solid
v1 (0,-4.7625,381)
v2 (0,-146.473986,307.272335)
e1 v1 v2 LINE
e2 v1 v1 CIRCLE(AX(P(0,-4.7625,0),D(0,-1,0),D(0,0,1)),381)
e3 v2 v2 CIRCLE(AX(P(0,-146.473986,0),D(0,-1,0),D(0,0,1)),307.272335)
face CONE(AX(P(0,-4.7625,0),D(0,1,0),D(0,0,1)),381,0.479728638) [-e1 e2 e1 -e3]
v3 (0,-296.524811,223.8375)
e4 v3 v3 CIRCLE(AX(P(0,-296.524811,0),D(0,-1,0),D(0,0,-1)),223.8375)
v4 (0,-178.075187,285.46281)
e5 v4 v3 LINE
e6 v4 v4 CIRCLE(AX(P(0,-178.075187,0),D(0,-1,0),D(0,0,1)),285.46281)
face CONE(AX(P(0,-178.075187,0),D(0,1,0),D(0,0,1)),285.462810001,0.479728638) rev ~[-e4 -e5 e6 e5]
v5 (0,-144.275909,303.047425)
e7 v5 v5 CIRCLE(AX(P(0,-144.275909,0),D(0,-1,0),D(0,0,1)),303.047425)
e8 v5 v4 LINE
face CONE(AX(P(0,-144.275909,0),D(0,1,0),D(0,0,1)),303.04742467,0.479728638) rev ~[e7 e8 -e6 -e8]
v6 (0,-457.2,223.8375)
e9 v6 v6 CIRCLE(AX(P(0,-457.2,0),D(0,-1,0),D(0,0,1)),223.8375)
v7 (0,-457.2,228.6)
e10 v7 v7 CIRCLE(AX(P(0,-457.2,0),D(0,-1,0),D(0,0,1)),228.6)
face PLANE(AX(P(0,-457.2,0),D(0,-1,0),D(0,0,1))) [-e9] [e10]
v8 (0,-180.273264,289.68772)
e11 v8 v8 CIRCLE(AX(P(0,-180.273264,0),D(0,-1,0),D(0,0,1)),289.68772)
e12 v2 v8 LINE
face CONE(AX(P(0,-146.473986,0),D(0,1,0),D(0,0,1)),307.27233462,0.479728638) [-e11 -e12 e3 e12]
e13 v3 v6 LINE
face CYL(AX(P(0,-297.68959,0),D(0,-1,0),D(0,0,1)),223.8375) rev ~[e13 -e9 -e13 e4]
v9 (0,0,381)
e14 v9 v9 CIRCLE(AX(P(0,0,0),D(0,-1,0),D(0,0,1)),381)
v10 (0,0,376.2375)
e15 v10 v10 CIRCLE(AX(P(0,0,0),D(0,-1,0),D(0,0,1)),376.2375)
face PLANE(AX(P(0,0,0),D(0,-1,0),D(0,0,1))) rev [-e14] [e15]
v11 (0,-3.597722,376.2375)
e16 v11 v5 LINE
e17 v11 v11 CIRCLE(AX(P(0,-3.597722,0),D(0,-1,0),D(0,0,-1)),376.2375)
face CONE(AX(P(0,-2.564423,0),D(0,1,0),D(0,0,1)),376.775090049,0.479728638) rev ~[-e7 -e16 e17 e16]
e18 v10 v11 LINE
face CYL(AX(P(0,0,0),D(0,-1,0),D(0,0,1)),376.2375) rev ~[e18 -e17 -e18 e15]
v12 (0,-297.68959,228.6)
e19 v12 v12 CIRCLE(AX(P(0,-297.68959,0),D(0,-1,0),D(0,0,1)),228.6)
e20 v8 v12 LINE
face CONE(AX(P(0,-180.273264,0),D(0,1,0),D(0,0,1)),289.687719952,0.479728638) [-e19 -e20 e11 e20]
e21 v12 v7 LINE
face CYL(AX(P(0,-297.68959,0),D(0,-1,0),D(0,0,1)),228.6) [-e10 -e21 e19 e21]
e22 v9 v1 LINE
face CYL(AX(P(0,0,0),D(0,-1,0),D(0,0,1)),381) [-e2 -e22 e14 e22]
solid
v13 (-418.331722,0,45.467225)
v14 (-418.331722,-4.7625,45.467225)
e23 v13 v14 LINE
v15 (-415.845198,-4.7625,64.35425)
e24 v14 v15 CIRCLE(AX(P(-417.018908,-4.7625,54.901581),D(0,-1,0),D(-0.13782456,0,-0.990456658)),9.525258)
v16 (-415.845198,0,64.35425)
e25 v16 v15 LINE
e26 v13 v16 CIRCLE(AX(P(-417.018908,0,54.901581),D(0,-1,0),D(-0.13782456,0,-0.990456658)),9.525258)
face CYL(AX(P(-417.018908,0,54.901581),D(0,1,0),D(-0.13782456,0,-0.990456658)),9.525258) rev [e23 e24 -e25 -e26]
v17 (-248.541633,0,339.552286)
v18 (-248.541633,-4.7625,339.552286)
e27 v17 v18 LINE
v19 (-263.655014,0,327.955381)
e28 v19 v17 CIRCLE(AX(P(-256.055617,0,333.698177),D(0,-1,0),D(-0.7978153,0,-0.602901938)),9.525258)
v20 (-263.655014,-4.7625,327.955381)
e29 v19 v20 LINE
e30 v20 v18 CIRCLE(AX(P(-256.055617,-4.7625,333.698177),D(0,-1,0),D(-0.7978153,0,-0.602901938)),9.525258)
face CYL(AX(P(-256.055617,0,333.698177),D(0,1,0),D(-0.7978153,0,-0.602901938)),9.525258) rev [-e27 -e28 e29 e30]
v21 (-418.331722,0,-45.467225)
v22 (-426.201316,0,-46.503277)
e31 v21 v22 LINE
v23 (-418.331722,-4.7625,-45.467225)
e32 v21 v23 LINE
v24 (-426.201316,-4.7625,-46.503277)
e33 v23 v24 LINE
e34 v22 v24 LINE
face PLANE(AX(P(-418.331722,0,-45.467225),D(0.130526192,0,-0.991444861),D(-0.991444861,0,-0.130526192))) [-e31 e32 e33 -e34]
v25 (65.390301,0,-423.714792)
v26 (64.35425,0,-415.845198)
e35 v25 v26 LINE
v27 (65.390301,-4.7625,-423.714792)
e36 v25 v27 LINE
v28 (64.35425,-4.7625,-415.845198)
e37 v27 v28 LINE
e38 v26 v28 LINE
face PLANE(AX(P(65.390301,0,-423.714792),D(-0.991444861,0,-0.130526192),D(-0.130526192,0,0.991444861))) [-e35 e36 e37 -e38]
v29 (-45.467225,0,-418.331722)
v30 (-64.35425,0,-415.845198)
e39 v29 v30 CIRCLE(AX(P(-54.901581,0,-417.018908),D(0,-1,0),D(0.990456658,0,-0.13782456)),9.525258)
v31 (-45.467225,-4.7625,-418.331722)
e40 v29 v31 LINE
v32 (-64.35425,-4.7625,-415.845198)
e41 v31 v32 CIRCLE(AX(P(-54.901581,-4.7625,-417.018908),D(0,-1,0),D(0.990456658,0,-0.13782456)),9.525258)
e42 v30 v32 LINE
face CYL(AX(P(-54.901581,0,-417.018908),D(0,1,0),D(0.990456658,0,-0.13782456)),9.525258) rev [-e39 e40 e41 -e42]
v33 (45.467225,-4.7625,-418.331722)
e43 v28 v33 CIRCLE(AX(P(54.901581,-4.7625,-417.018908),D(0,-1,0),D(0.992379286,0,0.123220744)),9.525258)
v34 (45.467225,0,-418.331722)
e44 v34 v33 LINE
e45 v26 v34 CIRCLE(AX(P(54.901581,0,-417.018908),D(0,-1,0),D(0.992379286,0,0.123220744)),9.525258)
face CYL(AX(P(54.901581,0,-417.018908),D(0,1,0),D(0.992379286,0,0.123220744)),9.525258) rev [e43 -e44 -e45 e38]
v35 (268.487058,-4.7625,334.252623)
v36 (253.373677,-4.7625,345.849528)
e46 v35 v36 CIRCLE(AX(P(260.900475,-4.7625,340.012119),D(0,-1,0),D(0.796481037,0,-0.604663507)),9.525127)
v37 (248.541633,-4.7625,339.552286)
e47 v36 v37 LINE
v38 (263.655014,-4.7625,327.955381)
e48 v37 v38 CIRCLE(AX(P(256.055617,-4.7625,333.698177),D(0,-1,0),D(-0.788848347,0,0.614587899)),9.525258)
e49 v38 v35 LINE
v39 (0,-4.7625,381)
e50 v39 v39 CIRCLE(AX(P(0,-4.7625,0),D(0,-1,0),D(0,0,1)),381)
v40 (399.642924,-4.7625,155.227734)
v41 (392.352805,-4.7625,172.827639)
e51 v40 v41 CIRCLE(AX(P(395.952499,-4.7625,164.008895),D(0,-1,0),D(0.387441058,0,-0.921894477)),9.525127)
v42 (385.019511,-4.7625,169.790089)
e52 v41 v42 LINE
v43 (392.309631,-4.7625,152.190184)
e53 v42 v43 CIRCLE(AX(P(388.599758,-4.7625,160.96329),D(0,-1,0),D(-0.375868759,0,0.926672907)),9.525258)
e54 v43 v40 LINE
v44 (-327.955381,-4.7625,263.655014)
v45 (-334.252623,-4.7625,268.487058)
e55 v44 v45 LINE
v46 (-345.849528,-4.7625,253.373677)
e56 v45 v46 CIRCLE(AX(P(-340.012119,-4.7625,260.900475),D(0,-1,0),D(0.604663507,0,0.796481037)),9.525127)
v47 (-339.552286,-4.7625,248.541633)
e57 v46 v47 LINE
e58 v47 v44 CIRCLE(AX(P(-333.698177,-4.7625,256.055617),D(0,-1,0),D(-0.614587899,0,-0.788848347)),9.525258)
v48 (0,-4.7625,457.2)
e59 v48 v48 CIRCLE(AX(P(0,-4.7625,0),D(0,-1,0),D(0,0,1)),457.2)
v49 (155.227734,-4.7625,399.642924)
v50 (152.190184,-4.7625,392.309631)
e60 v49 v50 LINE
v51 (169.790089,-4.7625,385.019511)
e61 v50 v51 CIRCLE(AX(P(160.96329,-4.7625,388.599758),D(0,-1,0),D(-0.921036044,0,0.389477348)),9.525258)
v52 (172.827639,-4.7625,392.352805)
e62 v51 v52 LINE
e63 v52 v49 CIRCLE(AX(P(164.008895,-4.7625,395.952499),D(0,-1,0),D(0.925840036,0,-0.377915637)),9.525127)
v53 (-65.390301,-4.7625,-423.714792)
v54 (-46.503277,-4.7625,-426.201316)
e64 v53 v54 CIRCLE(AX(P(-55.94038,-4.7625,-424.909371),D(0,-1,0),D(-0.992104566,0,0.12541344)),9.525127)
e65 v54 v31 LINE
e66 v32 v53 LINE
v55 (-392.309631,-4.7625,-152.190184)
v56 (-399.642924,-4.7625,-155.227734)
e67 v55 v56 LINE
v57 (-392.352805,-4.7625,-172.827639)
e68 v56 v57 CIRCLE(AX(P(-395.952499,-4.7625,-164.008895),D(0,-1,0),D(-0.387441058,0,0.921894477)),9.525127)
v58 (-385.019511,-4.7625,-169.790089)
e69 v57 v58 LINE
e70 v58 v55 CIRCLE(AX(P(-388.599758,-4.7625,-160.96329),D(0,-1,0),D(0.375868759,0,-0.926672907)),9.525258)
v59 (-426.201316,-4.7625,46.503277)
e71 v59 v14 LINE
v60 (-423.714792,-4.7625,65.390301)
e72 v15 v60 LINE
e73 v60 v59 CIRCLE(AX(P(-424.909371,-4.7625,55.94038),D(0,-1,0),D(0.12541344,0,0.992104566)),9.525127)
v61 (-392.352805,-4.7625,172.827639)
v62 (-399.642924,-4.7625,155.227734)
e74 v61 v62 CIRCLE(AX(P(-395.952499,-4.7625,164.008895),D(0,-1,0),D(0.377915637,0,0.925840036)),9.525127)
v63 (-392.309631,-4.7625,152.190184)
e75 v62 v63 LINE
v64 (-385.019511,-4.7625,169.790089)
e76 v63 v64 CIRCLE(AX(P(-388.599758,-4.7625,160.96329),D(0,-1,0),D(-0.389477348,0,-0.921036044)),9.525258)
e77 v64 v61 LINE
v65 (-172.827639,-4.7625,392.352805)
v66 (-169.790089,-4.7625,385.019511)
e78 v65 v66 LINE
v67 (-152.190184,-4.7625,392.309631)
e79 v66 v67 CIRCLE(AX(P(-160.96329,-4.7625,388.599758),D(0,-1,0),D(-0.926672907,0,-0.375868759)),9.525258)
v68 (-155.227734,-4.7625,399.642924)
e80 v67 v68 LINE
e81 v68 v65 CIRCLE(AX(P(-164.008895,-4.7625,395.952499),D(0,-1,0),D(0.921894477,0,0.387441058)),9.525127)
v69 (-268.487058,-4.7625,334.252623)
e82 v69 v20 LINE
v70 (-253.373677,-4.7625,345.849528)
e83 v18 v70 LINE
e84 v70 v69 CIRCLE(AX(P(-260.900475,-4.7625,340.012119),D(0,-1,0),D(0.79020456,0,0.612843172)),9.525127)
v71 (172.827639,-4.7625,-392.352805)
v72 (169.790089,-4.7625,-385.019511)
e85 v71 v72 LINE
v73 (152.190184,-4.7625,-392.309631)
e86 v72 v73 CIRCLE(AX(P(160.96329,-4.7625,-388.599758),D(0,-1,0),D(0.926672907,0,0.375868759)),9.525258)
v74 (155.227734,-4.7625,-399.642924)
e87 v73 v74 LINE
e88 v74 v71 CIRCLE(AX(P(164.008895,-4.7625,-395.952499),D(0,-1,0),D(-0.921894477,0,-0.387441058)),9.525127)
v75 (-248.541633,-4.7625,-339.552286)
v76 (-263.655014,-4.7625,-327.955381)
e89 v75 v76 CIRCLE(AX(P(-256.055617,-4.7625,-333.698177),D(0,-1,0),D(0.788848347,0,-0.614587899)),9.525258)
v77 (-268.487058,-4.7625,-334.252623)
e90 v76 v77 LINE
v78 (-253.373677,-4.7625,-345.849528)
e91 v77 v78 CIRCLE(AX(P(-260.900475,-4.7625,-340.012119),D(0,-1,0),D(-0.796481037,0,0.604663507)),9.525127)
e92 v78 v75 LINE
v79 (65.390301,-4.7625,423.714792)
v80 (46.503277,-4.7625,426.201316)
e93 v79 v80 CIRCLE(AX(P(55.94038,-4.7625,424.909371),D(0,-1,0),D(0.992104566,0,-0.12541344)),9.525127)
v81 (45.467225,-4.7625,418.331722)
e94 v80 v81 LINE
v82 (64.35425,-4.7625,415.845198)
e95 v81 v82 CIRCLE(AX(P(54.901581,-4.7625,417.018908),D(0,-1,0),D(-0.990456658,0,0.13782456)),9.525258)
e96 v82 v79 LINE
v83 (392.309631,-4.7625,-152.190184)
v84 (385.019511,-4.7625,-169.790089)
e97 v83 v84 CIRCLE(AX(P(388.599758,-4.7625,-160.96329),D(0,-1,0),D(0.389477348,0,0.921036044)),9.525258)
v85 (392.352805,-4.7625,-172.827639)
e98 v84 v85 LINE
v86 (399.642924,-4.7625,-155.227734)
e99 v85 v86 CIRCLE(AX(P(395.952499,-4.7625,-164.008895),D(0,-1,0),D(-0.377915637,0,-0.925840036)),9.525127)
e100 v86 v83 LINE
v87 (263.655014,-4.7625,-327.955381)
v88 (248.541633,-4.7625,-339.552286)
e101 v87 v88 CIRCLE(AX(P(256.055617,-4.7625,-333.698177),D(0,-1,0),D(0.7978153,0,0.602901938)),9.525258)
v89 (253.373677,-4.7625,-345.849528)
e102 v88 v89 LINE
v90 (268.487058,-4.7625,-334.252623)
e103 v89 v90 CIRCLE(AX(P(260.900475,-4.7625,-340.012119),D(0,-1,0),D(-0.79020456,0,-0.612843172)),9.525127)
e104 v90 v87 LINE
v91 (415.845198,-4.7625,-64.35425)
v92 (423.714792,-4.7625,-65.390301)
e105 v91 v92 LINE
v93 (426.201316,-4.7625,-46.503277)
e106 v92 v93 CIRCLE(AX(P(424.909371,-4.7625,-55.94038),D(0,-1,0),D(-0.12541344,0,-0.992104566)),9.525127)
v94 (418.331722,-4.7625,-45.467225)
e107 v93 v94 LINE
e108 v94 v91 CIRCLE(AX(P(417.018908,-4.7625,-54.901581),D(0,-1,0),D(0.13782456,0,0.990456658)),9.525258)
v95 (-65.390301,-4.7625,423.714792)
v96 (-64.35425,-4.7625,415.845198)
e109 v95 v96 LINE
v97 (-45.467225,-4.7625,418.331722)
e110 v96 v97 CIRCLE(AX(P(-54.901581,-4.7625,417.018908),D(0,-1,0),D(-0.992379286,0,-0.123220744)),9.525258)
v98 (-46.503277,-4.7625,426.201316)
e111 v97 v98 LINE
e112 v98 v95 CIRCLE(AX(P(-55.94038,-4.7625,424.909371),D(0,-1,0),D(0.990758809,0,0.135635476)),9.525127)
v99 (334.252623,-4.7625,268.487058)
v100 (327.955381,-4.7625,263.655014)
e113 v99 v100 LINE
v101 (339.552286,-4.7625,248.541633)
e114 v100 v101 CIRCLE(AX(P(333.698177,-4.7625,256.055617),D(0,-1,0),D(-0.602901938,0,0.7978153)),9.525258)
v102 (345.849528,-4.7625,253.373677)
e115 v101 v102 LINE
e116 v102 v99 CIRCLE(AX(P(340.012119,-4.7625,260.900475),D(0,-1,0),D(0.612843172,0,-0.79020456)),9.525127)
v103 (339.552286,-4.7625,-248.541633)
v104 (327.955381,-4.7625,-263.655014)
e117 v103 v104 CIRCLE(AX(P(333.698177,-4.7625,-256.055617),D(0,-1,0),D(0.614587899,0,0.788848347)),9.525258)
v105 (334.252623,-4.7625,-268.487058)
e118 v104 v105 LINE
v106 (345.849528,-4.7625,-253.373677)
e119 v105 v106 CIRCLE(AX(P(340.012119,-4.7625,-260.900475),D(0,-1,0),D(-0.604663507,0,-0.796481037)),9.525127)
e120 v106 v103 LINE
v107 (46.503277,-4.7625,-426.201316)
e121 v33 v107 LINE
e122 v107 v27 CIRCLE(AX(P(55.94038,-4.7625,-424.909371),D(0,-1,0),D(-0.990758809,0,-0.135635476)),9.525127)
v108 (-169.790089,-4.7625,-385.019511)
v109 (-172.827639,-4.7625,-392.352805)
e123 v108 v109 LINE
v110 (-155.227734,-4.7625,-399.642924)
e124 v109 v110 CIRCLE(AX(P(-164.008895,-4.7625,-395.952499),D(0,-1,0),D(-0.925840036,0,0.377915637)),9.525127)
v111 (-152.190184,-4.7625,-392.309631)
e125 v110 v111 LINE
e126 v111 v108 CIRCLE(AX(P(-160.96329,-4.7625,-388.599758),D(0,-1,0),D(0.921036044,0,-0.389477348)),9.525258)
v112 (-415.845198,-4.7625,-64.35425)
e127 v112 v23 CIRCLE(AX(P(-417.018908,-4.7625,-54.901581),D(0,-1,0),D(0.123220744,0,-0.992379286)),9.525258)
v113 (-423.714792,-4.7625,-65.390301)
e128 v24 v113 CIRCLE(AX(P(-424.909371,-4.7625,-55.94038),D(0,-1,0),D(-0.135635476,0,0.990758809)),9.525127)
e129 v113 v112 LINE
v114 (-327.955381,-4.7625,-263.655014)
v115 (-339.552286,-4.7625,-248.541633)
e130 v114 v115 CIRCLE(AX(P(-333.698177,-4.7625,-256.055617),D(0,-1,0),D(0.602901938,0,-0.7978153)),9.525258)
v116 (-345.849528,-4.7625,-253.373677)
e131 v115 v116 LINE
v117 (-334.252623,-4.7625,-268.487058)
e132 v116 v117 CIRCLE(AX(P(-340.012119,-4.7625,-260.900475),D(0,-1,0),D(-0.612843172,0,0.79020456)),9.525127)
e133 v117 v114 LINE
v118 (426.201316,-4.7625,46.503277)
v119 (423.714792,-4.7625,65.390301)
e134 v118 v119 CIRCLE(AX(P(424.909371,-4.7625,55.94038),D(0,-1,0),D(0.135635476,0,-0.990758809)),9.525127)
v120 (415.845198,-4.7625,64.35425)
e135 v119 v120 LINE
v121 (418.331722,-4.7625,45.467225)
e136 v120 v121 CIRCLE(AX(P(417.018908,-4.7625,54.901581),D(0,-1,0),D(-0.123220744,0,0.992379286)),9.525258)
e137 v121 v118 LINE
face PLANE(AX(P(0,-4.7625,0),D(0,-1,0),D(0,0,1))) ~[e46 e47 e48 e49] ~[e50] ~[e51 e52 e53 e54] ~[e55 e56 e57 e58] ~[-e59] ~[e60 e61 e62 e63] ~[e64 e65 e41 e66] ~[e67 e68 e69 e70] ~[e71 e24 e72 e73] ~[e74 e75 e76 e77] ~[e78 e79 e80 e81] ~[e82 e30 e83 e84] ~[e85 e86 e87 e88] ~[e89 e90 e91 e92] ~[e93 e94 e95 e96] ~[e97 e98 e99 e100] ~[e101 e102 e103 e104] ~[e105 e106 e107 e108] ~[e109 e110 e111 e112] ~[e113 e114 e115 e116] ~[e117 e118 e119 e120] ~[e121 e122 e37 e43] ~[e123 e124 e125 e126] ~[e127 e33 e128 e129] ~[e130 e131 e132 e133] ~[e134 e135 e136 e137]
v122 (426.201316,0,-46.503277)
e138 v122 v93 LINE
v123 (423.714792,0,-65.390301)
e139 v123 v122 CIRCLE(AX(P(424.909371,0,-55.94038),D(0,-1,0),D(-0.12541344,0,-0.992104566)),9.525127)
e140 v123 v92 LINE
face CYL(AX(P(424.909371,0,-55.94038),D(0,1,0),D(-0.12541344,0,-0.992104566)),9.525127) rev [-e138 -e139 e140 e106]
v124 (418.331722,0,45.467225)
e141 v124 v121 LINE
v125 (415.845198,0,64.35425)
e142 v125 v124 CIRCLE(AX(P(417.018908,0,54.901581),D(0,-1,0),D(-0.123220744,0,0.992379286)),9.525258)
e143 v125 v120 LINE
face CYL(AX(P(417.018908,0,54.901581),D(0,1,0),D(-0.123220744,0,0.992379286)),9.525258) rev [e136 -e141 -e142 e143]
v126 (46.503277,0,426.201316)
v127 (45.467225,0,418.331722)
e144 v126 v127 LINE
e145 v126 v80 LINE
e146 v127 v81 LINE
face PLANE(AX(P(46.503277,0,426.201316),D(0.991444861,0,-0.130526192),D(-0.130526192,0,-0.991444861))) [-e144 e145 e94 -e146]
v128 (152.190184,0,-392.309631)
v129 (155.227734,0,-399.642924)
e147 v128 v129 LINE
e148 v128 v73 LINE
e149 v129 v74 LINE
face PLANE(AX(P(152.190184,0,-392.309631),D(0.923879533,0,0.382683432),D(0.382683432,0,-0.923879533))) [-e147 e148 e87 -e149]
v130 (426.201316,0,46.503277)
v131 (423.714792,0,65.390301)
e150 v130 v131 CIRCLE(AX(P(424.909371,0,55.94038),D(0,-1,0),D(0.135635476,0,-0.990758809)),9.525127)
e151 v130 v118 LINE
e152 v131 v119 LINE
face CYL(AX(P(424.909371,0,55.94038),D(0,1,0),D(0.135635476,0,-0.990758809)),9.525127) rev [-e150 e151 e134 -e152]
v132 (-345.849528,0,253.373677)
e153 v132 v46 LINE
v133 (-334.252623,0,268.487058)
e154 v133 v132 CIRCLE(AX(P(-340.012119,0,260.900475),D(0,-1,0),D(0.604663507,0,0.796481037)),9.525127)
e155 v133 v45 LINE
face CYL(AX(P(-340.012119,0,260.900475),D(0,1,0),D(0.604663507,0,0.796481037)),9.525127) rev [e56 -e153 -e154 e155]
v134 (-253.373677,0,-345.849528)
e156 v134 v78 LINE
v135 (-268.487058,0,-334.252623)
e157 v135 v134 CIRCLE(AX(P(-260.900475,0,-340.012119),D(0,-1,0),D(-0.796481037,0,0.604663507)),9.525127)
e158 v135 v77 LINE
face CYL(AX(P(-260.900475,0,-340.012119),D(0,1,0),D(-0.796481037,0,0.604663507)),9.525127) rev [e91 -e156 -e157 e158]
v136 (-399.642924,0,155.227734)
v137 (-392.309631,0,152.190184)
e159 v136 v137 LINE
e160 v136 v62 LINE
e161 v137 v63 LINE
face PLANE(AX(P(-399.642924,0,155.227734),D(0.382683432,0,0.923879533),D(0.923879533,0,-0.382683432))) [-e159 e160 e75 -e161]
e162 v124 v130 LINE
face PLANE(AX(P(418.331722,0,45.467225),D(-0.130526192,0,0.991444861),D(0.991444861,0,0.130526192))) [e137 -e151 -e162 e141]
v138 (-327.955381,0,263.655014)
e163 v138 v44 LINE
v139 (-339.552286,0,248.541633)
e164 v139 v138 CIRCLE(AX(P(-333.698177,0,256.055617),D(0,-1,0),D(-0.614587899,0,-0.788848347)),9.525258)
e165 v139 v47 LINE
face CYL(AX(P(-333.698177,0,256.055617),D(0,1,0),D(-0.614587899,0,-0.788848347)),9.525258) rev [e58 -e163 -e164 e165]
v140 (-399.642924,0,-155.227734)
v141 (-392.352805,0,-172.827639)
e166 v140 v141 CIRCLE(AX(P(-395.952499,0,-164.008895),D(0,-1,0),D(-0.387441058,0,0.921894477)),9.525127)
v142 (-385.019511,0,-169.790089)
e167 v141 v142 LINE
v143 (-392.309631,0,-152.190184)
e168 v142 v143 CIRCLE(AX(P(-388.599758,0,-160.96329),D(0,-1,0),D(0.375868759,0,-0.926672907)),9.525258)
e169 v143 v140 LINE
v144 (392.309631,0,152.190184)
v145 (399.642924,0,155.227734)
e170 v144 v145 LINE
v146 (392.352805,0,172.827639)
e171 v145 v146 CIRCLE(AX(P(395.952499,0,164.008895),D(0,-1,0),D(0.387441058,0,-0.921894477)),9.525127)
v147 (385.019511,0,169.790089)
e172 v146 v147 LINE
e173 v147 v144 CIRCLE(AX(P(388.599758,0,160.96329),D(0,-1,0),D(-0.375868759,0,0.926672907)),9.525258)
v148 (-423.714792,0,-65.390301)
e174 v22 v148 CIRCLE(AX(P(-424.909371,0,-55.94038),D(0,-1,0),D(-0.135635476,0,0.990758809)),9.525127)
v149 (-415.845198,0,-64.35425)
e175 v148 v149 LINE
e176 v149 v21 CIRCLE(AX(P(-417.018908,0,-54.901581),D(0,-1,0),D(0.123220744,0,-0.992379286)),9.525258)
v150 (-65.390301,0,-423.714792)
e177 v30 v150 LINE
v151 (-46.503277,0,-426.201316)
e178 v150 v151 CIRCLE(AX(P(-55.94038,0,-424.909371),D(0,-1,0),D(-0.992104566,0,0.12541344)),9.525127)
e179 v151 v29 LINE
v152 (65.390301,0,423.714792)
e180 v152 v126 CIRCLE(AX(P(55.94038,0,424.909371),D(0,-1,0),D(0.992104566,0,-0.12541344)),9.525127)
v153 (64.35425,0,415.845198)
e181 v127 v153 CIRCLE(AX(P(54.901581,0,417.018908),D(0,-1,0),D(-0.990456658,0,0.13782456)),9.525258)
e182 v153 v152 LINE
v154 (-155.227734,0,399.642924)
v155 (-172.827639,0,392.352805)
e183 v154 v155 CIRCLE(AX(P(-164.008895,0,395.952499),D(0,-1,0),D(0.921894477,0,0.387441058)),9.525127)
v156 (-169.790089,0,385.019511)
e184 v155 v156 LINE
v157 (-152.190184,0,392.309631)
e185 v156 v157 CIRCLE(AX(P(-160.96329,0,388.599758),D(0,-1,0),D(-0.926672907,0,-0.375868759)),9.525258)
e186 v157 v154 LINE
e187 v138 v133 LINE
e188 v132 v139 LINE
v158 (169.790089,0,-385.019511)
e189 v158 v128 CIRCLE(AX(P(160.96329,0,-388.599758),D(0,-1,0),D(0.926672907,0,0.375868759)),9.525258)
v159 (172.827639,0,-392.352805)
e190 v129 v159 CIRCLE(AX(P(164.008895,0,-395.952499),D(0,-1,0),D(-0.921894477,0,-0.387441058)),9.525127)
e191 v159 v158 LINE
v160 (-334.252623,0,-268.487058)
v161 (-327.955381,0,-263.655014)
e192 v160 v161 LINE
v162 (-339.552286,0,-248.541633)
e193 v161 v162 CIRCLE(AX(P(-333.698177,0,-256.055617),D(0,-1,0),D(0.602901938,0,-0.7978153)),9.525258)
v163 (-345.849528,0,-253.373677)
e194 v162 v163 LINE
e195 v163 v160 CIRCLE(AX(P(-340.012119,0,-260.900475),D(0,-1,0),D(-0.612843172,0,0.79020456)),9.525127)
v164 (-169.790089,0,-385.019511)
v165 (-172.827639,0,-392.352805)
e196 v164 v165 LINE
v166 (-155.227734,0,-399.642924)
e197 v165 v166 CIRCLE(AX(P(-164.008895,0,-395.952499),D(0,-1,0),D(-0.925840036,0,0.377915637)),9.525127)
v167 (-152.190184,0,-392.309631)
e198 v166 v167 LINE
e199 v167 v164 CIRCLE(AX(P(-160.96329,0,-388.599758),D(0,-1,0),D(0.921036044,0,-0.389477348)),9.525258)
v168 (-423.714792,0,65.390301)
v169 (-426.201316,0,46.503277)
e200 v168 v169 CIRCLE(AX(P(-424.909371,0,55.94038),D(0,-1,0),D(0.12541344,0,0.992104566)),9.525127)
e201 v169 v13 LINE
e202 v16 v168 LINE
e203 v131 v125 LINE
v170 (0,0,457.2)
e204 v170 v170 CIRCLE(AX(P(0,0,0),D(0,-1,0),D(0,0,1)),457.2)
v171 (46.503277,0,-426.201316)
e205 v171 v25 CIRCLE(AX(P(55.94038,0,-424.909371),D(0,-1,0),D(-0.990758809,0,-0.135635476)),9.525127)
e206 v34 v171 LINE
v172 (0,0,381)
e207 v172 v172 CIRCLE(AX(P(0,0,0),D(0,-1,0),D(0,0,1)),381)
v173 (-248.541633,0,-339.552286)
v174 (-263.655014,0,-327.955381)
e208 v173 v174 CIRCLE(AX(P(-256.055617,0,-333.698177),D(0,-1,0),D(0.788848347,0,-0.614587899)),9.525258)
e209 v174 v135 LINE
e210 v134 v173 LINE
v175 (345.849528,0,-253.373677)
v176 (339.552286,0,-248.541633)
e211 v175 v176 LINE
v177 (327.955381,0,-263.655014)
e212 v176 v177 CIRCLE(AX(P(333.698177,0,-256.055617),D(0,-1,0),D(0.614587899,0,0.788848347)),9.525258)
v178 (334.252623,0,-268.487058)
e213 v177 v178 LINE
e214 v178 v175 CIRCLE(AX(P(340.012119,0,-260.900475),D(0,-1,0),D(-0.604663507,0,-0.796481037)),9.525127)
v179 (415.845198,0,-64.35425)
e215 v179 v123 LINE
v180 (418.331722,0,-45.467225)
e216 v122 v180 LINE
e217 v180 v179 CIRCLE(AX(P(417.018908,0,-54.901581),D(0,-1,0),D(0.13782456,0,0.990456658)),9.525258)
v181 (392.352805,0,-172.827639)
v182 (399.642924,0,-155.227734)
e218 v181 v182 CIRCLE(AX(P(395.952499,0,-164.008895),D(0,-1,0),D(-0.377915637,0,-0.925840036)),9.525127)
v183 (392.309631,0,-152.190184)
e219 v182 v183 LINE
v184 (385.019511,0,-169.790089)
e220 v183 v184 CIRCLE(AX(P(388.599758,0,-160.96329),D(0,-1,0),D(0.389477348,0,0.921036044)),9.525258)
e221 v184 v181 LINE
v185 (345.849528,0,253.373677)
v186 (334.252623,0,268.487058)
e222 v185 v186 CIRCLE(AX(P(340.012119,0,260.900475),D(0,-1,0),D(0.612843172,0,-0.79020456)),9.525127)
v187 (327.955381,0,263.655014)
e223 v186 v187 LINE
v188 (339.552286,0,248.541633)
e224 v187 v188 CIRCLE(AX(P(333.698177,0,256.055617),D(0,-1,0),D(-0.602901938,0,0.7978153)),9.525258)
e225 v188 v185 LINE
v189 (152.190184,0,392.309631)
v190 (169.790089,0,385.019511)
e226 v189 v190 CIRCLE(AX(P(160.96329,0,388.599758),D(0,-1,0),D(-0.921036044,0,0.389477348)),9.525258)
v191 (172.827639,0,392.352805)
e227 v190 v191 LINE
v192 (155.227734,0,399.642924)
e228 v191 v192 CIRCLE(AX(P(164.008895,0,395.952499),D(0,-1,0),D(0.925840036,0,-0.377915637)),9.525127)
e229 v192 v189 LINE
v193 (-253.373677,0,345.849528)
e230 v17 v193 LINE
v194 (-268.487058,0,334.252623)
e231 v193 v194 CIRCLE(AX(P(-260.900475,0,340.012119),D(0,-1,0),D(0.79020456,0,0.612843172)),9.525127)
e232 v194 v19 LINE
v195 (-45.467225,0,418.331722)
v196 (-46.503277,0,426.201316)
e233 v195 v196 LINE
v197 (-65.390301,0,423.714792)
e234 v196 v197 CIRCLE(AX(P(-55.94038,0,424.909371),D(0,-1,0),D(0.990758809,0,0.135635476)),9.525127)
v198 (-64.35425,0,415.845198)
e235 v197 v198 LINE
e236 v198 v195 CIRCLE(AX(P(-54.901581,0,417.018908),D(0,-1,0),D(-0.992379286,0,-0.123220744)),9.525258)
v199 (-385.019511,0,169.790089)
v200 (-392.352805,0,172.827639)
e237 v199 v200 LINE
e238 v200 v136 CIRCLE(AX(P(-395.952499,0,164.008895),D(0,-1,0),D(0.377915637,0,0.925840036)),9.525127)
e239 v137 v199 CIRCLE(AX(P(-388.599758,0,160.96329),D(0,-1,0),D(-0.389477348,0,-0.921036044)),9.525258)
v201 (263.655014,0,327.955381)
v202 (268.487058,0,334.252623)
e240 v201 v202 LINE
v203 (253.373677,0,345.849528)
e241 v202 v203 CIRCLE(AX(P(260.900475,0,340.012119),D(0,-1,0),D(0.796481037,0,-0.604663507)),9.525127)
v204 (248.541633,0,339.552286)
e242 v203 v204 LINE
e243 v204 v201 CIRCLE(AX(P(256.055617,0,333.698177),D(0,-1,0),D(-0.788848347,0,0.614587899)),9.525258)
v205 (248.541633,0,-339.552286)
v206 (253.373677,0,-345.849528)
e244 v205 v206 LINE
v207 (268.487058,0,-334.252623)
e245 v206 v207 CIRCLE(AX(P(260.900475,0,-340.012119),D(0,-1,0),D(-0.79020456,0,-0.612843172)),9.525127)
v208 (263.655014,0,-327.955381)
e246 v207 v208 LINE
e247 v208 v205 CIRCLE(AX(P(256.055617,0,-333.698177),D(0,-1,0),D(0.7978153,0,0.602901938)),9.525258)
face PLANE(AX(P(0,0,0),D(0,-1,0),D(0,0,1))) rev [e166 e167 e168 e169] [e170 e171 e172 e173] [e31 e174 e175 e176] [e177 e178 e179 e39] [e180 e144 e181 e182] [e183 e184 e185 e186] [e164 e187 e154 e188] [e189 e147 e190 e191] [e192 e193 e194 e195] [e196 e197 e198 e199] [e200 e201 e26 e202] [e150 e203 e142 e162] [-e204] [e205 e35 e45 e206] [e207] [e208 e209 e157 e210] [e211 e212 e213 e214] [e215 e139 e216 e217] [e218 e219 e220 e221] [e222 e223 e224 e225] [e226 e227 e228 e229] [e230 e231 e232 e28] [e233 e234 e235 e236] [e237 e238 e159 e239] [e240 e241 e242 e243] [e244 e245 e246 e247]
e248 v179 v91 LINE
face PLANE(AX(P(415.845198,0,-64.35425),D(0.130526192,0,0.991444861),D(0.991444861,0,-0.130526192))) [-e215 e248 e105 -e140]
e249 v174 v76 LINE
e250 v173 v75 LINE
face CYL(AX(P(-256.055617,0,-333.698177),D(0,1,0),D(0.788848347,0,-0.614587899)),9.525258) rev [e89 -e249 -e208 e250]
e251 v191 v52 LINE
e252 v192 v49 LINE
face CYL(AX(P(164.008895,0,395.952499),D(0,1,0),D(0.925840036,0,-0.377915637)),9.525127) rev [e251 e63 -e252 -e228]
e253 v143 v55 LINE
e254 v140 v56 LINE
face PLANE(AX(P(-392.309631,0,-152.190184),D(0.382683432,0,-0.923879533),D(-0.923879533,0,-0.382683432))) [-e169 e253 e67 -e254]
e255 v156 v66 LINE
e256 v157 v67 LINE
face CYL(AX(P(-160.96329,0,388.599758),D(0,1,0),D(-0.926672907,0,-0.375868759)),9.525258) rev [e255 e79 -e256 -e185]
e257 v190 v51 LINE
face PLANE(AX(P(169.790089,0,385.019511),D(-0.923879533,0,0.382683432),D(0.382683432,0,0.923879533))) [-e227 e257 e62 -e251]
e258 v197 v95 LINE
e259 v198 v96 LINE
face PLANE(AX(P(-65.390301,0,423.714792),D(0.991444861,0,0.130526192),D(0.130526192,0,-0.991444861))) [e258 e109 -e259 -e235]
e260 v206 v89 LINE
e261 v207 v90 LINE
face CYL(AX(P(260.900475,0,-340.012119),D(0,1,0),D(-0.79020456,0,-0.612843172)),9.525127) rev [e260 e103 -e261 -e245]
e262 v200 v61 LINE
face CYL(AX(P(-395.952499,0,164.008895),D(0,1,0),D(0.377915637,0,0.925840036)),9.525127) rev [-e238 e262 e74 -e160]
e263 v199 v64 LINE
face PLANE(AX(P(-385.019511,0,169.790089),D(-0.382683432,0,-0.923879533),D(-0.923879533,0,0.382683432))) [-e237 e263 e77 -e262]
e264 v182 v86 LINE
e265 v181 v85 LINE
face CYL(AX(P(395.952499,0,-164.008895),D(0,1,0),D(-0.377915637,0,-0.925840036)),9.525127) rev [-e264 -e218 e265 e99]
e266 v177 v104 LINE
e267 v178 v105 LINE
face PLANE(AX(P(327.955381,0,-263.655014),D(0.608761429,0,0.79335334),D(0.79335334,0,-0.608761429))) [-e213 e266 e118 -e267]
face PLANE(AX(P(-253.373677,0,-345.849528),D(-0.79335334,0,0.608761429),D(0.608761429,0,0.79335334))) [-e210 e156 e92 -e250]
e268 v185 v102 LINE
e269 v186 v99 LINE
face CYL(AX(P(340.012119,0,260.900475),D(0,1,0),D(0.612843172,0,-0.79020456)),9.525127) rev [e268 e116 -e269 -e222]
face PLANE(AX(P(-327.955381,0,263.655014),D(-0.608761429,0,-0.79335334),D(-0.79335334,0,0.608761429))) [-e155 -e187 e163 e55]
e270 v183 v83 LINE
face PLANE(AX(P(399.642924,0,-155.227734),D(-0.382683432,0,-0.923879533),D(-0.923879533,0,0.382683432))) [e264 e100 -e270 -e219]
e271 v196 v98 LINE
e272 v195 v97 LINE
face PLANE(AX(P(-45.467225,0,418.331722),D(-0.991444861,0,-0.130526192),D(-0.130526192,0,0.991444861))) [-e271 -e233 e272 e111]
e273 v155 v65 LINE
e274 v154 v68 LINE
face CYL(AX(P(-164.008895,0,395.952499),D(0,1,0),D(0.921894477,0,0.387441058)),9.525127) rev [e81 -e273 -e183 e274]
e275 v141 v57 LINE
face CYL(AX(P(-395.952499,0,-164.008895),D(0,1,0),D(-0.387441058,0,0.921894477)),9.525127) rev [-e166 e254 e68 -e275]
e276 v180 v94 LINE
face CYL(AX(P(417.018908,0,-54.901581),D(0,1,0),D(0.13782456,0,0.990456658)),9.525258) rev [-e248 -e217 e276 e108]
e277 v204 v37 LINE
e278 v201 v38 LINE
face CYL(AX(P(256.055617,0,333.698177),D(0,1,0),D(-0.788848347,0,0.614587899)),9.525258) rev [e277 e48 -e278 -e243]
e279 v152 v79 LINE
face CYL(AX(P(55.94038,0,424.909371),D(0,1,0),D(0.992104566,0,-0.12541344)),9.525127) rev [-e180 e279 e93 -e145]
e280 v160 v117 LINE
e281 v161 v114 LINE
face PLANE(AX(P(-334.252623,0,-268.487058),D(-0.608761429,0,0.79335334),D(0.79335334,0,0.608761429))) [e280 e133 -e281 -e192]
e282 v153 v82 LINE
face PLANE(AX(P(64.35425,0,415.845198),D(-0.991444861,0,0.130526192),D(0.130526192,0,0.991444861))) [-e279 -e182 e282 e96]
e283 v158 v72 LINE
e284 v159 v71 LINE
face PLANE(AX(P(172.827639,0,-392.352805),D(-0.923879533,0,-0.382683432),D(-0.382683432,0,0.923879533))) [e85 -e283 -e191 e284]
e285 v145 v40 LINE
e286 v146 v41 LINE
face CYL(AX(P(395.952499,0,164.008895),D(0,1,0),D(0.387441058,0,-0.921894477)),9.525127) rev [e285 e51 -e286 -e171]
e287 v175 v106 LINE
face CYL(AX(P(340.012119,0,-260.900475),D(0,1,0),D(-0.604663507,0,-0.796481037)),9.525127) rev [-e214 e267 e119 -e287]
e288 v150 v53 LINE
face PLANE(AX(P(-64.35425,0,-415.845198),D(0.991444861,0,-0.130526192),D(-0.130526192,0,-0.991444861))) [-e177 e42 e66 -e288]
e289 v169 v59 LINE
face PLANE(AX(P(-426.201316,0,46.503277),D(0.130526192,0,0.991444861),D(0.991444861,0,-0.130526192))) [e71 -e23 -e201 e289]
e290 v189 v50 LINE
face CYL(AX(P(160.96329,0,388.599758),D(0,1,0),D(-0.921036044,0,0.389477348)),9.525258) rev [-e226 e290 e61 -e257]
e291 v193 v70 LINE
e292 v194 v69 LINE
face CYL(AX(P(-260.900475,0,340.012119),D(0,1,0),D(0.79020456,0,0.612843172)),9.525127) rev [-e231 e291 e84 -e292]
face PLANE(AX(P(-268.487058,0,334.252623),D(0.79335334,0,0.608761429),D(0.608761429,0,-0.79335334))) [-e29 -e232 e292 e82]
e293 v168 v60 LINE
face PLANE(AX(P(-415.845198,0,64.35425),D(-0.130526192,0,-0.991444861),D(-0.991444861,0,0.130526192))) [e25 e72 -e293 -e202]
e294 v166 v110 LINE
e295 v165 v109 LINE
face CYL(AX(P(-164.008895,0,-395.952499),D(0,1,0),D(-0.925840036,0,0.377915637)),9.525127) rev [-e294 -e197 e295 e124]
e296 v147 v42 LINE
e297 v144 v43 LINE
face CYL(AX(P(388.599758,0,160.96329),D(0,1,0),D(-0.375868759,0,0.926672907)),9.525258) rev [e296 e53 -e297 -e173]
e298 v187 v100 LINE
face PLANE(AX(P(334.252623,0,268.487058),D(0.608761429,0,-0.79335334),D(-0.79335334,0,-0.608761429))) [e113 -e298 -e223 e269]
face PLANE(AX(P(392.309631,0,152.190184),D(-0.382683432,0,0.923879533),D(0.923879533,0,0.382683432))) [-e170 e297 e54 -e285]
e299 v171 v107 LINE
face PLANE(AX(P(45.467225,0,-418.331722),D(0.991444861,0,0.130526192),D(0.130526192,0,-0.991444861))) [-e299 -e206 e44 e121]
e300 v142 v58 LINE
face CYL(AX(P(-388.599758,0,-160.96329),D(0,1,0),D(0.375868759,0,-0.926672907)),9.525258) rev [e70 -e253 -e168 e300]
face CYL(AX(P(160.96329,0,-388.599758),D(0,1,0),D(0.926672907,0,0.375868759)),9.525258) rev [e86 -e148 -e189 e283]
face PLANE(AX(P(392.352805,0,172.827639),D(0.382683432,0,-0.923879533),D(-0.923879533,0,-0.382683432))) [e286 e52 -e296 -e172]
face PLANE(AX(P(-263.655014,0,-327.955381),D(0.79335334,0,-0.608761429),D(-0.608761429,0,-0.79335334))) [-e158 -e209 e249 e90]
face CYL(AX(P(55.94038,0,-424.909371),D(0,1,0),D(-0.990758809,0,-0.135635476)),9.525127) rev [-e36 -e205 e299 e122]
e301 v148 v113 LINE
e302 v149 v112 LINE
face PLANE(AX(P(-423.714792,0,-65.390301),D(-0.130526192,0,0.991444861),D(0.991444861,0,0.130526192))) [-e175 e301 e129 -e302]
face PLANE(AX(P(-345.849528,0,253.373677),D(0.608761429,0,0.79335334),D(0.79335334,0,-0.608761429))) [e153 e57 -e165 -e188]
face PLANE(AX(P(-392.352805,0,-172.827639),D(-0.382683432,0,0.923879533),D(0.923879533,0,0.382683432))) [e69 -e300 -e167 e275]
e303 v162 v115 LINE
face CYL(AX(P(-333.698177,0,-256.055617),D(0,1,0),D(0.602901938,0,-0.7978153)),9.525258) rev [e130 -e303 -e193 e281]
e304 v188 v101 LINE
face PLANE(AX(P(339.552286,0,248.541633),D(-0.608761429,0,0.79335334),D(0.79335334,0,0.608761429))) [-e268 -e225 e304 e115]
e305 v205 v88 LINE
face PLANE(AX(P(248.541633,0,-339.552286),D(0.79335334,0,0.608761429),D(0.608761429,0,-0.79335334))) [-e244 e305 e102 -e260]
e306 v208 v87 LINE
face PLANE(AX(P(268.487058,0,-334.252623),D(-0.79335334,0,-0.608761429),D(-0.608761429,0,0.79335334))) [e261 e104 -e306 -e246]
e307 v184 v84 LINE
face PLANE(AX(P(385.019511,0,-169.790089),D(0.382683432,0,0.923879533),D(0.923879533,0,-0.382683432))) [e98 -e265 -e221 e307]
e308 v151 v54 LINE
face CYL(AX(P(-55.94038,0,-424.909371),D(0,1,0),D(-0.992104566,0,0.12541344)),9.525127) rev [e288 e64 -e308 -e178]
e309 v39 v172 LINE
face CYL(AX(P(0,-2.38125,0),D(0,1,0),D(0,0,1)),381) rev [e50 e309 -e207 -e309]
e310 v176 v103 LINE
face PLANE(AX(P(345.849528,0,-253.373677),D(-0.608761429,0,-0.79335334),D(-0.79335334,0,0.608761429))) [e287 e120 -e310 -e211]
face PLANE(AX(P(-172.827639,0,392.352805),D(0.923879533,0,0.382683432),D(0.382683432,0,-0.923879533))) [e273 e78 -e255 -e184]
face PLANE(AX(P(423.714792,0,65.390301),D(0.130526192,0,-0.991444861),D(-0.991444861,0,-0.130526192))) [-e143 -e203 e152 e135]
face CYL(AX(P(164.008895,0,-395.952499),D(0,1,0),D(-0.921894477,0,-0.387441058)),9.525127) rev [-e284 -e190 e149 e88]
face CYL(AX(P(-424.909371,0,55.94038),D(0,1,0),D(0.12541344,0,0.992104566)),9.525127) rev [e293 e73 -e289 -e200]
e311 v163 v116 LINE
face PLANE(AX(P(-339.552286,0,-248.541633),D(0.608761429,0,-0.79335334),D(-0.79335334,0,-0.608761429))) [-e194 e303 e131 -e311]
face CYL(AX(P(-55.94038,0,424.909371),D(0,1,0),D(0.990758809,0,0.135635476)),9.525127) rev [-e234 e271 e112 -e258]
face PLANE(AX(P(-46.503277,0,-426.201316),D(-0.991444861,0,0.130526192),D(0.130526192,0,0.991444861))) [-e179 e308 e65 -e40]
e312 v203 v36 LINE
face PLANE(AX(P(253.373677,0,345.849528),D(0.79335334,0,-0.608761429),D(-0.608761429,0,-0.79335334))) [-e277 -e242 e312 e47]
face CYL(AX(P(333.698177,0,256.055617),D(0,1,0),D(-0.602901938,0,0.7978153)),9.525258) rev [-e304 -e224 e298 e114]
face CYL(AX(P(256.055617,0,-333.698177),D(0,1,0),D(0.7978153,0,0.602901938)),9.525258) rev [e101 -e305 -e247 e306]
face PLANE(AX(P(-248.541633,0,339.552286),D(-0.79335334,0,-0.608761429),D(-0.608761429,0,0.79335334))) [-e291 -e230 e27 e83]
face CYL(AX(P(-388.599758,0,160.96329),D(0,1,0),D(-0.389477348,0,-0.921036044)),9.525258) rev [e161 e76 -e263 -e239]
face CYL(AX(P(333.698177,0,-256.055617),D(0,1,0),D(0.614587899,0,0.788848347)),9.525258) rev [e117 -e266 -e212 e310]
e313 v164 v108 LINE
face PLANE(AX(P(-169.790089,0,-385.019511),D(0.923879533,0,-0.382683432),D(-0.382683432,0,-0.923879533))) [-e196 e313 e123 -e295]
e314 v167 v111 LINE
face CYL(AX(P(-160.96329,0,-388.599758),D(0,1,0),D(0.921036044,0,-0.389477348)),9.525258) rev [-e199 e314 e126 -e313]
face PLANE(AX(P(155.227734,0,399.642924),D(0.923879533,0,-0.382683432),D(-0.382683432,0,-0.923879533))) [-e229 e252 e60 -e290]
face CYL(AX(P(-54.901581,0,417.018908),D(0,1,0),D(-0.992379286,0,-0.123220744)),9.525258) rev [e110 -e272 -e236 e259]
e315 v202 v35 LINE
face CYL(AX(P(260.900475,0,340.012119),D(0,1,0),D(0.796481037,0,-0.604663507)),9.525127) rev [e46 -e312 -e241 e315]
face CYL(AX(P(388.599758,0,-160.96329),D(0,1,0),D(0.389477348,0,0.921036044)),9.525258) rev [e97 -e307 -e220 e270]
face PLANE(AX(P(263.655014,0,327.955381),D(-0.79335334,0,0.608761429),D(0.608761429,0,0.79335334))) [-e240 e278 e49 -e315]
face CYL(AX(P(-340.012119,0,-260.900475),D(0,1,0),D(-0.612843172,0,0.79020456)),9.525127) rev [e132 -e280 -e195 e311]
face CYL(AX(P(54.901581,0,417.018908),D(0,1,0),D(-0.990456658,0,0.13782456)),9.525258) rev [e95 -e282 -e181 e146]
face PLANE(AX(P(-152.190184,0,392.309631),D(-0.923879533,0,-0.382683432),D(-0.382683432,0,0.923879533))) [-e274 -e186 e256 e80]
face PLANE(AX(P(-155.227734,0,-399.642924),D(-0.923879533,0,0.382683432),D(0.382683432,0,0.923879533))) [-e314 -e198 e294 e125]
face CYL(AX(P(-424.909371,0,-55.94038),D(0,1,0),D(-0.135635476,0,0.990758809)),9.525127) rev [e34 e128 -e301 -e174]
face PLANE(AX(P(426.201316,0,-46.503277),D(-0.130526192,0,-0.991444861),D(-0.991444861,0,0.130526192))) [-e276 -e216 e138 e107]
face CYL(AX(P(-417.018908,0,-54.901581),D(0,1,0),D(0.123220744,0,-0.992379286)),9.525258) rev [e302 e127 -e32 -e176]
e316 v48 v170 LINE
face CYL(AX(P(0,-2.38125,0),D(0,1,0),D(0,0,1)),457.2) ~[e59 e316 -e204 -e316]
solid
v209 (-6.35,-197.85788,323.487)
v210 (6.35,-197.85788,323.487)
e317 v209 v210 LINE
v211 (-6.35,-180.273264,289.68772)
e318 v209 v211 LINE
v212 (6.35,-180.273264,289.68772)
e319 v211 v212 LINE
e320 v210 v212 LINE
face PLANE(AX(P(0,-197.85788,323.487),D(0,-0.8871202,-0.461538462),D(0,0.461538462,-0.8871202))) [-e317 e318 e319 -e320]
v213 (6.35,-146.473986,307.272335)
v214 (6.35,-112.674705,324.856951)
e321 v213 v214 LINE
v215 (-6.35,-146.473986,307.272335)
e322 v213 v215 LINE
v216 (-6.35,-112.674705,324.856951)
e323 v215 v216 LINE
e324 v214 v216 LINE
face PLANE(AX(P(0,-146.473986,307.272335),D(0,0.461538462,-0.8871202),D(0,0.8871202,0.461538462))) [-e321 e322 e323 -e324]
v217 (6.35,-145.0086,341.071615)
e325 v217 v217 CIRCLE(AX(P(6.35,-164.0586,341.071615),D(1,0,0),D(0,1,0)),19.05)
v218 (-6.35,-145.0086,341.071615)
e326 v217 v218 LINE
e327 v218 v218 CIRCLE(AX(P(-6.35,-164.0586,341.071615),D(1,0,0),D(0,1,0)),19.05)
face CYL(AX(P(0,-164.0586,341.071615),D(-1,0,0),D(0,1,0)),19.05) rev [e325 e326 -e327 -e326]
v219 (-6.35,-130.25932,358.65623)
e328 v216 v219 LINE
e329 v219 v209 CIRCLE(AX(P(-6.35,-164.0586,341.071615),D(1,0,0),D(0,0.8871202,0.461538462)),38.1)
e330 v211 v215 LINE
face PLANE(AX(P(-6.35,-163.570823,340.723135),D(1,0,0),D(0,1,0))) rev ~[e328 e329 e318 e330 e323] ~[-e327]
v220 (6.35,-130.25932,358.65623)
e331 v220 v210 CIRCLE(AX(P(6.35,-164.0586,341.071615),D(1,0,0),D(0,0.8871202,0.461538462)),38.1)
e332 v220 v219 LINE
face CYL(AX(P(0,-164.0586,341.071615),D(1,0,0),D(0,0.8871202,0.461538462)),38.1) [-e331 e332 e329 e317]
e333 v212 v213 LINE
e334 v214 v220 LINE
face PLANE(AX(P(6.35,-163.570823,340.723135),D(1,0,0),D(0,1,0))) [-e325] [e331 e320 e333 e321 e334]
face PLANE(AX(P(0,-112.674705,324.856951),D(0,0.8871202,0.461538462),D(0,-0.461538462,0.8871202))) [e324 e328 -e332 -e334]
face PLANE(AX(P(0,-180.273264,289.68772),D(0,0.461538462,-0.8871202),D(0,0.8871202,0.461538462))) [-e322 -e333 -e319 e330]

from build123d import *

# Parameters (mm, degrees)
F3_W            = 4.7625
F3_H            = 76.2
F6_T            = -4.7625
F8_DEPTH        = 4.7625
F8_COPIES_COUNT = 24
F3_R            = 19.05
F9_DEPTH        = 6.35


# Not quite as in the source:
# - a pattern or mirror of a feature is missing from the dataset's text; its kind, count and spacing are read off the source's solid


with BuildPart() as f4:
    # F3 (on Right) → F4 (revolve)
    with BuildSketch(Plane.YZ):
        with Locations((-2.38125, 419.1)):
            Rectangle(F3_W, F3_H)
    revolve(axis=Axis((0, -209.601546452, 0), (0, -1, 0)))

    # F7 (on Front) → F8 (cut, through all)
    with BuildSketch(Plane.XZ):
        with BuildLine():
            Line((64.3542497942, 415.8451981383), (65.3903014449, 423.7147917255))
            ThreePointArc((65.3903014449, 423.7147917255), (57.1836583904, 434.3530083993), (46.5032768357, 426.2013156872))
            Line((46.5032768357, 426.2013156872), (45.467225185, 418.3317221001))
            ThreePointArc((45.467225185, 418.3317221001), (53.6582850209, 407.5751391295), (64.3542497942, 415.8451981383))
        make_face()
    f8 = extrude(amount=F8_DEPTH, mode=Mode.SUBTRACT)

    # F8_copies: F8 ×24 about axis
    f8_copies_axis = Axis((0, 0, 0), (0, 1, 0))
    for i in range(1, F8_COPIES_COUNT):
        add(f8.rotate(f8_copies_axis, i * 360 / F8_COPIES_COUNT), mode=Mode.SUBTRACT)


with BuildPart() as f5:
    # F3 (on Right) → F5 (revolve)
    with BuildSketch(Plane.YZ):
        Polygon((0, 381), (-4.7625, 381), (-112.674705011, 324.856950721), (-146.4739859916, 307.2723346204), (-180.2732642198, 289.6877199517), (-297.6895899046, 228.6), (-457.2, 228.6), (-457.2, 0), (0, 0), align=None)
    revolve(axis=Axis((0, -209.601546452, 0), (0, -1, 0)))

    # F6
    f6_openings = [f5.faces().sort_by_distance(p)[0] for p in [
        (0, -457.2, 0),
        (0, 0, 0),
    ]]
    offset(amount=F6_T, openings=f6_openings, kind=Kind.INTERSECTION)


with BuildPart() as f9:
    # F3 (on Right) → F9 (new body, symmetric)
    with BuildSketch(Plane.YZ):
        with BuildLine():
            ThreePointArc((-197.8578796044, 323.4869995561), (-175.5240997642, 304.7377145837), (-146.4739859916, 307.2723346204))
            ThreePointArc((-146.4739859916, 307.2723346204), (-131.488799619, 321.3024950023), (-125.9586, 341.0716149407))
            ThreePointArc((-125.9586, 341.0716149407), (-127.0493947064, 350.123063639), (-130.2593203956, 358.6562303254))
            ThreePointArc((-130.2593203956, 358.6562303254), (-181.6432153846, 374.8708945451), (-197.8578796044, 323.4869995561))
        make_face()
        with Locations((-164.0586, 341.0716149407)):
            Circle(F3_R, mode=Mode.SUBTRACT)
        with BuildLine():
            Line((-180.2732642198, 289.6877199517), (-146.4739859916, 307.2723346204))
            ThreePointArc((-146.4739859916, 307.2723346204), (-175.5240997642, 304.7377145837), (-197.8578796044, 323.4869995561))
            Line((-197.8578796044, 323.4869995561), (-180.2732642198, 289.6877199517))
        make_face()
        with BuildLine():
            Line((-146.4739859916, 307.2723346204), (-112.674705011, 324.856950721))
            Line((-112.674705011, 324.856950721), (-130.2593203956, 358.6562303254))
            ThreePointArc((-130.2593203956, 358.6562303254), (-127.0493947064, 350.123063639), (-125.9586, 341.0716149407))
            ThreePointArc((-125.9586, 341.0716149407), (-131.488799619, 321.3024950023), (-146.4739859916, 307.2723346204))
        make_face()
    extrude(amount=F9_DEPTH, both=True)


solid = Compound([f4.part, f5.part, f9.part])
